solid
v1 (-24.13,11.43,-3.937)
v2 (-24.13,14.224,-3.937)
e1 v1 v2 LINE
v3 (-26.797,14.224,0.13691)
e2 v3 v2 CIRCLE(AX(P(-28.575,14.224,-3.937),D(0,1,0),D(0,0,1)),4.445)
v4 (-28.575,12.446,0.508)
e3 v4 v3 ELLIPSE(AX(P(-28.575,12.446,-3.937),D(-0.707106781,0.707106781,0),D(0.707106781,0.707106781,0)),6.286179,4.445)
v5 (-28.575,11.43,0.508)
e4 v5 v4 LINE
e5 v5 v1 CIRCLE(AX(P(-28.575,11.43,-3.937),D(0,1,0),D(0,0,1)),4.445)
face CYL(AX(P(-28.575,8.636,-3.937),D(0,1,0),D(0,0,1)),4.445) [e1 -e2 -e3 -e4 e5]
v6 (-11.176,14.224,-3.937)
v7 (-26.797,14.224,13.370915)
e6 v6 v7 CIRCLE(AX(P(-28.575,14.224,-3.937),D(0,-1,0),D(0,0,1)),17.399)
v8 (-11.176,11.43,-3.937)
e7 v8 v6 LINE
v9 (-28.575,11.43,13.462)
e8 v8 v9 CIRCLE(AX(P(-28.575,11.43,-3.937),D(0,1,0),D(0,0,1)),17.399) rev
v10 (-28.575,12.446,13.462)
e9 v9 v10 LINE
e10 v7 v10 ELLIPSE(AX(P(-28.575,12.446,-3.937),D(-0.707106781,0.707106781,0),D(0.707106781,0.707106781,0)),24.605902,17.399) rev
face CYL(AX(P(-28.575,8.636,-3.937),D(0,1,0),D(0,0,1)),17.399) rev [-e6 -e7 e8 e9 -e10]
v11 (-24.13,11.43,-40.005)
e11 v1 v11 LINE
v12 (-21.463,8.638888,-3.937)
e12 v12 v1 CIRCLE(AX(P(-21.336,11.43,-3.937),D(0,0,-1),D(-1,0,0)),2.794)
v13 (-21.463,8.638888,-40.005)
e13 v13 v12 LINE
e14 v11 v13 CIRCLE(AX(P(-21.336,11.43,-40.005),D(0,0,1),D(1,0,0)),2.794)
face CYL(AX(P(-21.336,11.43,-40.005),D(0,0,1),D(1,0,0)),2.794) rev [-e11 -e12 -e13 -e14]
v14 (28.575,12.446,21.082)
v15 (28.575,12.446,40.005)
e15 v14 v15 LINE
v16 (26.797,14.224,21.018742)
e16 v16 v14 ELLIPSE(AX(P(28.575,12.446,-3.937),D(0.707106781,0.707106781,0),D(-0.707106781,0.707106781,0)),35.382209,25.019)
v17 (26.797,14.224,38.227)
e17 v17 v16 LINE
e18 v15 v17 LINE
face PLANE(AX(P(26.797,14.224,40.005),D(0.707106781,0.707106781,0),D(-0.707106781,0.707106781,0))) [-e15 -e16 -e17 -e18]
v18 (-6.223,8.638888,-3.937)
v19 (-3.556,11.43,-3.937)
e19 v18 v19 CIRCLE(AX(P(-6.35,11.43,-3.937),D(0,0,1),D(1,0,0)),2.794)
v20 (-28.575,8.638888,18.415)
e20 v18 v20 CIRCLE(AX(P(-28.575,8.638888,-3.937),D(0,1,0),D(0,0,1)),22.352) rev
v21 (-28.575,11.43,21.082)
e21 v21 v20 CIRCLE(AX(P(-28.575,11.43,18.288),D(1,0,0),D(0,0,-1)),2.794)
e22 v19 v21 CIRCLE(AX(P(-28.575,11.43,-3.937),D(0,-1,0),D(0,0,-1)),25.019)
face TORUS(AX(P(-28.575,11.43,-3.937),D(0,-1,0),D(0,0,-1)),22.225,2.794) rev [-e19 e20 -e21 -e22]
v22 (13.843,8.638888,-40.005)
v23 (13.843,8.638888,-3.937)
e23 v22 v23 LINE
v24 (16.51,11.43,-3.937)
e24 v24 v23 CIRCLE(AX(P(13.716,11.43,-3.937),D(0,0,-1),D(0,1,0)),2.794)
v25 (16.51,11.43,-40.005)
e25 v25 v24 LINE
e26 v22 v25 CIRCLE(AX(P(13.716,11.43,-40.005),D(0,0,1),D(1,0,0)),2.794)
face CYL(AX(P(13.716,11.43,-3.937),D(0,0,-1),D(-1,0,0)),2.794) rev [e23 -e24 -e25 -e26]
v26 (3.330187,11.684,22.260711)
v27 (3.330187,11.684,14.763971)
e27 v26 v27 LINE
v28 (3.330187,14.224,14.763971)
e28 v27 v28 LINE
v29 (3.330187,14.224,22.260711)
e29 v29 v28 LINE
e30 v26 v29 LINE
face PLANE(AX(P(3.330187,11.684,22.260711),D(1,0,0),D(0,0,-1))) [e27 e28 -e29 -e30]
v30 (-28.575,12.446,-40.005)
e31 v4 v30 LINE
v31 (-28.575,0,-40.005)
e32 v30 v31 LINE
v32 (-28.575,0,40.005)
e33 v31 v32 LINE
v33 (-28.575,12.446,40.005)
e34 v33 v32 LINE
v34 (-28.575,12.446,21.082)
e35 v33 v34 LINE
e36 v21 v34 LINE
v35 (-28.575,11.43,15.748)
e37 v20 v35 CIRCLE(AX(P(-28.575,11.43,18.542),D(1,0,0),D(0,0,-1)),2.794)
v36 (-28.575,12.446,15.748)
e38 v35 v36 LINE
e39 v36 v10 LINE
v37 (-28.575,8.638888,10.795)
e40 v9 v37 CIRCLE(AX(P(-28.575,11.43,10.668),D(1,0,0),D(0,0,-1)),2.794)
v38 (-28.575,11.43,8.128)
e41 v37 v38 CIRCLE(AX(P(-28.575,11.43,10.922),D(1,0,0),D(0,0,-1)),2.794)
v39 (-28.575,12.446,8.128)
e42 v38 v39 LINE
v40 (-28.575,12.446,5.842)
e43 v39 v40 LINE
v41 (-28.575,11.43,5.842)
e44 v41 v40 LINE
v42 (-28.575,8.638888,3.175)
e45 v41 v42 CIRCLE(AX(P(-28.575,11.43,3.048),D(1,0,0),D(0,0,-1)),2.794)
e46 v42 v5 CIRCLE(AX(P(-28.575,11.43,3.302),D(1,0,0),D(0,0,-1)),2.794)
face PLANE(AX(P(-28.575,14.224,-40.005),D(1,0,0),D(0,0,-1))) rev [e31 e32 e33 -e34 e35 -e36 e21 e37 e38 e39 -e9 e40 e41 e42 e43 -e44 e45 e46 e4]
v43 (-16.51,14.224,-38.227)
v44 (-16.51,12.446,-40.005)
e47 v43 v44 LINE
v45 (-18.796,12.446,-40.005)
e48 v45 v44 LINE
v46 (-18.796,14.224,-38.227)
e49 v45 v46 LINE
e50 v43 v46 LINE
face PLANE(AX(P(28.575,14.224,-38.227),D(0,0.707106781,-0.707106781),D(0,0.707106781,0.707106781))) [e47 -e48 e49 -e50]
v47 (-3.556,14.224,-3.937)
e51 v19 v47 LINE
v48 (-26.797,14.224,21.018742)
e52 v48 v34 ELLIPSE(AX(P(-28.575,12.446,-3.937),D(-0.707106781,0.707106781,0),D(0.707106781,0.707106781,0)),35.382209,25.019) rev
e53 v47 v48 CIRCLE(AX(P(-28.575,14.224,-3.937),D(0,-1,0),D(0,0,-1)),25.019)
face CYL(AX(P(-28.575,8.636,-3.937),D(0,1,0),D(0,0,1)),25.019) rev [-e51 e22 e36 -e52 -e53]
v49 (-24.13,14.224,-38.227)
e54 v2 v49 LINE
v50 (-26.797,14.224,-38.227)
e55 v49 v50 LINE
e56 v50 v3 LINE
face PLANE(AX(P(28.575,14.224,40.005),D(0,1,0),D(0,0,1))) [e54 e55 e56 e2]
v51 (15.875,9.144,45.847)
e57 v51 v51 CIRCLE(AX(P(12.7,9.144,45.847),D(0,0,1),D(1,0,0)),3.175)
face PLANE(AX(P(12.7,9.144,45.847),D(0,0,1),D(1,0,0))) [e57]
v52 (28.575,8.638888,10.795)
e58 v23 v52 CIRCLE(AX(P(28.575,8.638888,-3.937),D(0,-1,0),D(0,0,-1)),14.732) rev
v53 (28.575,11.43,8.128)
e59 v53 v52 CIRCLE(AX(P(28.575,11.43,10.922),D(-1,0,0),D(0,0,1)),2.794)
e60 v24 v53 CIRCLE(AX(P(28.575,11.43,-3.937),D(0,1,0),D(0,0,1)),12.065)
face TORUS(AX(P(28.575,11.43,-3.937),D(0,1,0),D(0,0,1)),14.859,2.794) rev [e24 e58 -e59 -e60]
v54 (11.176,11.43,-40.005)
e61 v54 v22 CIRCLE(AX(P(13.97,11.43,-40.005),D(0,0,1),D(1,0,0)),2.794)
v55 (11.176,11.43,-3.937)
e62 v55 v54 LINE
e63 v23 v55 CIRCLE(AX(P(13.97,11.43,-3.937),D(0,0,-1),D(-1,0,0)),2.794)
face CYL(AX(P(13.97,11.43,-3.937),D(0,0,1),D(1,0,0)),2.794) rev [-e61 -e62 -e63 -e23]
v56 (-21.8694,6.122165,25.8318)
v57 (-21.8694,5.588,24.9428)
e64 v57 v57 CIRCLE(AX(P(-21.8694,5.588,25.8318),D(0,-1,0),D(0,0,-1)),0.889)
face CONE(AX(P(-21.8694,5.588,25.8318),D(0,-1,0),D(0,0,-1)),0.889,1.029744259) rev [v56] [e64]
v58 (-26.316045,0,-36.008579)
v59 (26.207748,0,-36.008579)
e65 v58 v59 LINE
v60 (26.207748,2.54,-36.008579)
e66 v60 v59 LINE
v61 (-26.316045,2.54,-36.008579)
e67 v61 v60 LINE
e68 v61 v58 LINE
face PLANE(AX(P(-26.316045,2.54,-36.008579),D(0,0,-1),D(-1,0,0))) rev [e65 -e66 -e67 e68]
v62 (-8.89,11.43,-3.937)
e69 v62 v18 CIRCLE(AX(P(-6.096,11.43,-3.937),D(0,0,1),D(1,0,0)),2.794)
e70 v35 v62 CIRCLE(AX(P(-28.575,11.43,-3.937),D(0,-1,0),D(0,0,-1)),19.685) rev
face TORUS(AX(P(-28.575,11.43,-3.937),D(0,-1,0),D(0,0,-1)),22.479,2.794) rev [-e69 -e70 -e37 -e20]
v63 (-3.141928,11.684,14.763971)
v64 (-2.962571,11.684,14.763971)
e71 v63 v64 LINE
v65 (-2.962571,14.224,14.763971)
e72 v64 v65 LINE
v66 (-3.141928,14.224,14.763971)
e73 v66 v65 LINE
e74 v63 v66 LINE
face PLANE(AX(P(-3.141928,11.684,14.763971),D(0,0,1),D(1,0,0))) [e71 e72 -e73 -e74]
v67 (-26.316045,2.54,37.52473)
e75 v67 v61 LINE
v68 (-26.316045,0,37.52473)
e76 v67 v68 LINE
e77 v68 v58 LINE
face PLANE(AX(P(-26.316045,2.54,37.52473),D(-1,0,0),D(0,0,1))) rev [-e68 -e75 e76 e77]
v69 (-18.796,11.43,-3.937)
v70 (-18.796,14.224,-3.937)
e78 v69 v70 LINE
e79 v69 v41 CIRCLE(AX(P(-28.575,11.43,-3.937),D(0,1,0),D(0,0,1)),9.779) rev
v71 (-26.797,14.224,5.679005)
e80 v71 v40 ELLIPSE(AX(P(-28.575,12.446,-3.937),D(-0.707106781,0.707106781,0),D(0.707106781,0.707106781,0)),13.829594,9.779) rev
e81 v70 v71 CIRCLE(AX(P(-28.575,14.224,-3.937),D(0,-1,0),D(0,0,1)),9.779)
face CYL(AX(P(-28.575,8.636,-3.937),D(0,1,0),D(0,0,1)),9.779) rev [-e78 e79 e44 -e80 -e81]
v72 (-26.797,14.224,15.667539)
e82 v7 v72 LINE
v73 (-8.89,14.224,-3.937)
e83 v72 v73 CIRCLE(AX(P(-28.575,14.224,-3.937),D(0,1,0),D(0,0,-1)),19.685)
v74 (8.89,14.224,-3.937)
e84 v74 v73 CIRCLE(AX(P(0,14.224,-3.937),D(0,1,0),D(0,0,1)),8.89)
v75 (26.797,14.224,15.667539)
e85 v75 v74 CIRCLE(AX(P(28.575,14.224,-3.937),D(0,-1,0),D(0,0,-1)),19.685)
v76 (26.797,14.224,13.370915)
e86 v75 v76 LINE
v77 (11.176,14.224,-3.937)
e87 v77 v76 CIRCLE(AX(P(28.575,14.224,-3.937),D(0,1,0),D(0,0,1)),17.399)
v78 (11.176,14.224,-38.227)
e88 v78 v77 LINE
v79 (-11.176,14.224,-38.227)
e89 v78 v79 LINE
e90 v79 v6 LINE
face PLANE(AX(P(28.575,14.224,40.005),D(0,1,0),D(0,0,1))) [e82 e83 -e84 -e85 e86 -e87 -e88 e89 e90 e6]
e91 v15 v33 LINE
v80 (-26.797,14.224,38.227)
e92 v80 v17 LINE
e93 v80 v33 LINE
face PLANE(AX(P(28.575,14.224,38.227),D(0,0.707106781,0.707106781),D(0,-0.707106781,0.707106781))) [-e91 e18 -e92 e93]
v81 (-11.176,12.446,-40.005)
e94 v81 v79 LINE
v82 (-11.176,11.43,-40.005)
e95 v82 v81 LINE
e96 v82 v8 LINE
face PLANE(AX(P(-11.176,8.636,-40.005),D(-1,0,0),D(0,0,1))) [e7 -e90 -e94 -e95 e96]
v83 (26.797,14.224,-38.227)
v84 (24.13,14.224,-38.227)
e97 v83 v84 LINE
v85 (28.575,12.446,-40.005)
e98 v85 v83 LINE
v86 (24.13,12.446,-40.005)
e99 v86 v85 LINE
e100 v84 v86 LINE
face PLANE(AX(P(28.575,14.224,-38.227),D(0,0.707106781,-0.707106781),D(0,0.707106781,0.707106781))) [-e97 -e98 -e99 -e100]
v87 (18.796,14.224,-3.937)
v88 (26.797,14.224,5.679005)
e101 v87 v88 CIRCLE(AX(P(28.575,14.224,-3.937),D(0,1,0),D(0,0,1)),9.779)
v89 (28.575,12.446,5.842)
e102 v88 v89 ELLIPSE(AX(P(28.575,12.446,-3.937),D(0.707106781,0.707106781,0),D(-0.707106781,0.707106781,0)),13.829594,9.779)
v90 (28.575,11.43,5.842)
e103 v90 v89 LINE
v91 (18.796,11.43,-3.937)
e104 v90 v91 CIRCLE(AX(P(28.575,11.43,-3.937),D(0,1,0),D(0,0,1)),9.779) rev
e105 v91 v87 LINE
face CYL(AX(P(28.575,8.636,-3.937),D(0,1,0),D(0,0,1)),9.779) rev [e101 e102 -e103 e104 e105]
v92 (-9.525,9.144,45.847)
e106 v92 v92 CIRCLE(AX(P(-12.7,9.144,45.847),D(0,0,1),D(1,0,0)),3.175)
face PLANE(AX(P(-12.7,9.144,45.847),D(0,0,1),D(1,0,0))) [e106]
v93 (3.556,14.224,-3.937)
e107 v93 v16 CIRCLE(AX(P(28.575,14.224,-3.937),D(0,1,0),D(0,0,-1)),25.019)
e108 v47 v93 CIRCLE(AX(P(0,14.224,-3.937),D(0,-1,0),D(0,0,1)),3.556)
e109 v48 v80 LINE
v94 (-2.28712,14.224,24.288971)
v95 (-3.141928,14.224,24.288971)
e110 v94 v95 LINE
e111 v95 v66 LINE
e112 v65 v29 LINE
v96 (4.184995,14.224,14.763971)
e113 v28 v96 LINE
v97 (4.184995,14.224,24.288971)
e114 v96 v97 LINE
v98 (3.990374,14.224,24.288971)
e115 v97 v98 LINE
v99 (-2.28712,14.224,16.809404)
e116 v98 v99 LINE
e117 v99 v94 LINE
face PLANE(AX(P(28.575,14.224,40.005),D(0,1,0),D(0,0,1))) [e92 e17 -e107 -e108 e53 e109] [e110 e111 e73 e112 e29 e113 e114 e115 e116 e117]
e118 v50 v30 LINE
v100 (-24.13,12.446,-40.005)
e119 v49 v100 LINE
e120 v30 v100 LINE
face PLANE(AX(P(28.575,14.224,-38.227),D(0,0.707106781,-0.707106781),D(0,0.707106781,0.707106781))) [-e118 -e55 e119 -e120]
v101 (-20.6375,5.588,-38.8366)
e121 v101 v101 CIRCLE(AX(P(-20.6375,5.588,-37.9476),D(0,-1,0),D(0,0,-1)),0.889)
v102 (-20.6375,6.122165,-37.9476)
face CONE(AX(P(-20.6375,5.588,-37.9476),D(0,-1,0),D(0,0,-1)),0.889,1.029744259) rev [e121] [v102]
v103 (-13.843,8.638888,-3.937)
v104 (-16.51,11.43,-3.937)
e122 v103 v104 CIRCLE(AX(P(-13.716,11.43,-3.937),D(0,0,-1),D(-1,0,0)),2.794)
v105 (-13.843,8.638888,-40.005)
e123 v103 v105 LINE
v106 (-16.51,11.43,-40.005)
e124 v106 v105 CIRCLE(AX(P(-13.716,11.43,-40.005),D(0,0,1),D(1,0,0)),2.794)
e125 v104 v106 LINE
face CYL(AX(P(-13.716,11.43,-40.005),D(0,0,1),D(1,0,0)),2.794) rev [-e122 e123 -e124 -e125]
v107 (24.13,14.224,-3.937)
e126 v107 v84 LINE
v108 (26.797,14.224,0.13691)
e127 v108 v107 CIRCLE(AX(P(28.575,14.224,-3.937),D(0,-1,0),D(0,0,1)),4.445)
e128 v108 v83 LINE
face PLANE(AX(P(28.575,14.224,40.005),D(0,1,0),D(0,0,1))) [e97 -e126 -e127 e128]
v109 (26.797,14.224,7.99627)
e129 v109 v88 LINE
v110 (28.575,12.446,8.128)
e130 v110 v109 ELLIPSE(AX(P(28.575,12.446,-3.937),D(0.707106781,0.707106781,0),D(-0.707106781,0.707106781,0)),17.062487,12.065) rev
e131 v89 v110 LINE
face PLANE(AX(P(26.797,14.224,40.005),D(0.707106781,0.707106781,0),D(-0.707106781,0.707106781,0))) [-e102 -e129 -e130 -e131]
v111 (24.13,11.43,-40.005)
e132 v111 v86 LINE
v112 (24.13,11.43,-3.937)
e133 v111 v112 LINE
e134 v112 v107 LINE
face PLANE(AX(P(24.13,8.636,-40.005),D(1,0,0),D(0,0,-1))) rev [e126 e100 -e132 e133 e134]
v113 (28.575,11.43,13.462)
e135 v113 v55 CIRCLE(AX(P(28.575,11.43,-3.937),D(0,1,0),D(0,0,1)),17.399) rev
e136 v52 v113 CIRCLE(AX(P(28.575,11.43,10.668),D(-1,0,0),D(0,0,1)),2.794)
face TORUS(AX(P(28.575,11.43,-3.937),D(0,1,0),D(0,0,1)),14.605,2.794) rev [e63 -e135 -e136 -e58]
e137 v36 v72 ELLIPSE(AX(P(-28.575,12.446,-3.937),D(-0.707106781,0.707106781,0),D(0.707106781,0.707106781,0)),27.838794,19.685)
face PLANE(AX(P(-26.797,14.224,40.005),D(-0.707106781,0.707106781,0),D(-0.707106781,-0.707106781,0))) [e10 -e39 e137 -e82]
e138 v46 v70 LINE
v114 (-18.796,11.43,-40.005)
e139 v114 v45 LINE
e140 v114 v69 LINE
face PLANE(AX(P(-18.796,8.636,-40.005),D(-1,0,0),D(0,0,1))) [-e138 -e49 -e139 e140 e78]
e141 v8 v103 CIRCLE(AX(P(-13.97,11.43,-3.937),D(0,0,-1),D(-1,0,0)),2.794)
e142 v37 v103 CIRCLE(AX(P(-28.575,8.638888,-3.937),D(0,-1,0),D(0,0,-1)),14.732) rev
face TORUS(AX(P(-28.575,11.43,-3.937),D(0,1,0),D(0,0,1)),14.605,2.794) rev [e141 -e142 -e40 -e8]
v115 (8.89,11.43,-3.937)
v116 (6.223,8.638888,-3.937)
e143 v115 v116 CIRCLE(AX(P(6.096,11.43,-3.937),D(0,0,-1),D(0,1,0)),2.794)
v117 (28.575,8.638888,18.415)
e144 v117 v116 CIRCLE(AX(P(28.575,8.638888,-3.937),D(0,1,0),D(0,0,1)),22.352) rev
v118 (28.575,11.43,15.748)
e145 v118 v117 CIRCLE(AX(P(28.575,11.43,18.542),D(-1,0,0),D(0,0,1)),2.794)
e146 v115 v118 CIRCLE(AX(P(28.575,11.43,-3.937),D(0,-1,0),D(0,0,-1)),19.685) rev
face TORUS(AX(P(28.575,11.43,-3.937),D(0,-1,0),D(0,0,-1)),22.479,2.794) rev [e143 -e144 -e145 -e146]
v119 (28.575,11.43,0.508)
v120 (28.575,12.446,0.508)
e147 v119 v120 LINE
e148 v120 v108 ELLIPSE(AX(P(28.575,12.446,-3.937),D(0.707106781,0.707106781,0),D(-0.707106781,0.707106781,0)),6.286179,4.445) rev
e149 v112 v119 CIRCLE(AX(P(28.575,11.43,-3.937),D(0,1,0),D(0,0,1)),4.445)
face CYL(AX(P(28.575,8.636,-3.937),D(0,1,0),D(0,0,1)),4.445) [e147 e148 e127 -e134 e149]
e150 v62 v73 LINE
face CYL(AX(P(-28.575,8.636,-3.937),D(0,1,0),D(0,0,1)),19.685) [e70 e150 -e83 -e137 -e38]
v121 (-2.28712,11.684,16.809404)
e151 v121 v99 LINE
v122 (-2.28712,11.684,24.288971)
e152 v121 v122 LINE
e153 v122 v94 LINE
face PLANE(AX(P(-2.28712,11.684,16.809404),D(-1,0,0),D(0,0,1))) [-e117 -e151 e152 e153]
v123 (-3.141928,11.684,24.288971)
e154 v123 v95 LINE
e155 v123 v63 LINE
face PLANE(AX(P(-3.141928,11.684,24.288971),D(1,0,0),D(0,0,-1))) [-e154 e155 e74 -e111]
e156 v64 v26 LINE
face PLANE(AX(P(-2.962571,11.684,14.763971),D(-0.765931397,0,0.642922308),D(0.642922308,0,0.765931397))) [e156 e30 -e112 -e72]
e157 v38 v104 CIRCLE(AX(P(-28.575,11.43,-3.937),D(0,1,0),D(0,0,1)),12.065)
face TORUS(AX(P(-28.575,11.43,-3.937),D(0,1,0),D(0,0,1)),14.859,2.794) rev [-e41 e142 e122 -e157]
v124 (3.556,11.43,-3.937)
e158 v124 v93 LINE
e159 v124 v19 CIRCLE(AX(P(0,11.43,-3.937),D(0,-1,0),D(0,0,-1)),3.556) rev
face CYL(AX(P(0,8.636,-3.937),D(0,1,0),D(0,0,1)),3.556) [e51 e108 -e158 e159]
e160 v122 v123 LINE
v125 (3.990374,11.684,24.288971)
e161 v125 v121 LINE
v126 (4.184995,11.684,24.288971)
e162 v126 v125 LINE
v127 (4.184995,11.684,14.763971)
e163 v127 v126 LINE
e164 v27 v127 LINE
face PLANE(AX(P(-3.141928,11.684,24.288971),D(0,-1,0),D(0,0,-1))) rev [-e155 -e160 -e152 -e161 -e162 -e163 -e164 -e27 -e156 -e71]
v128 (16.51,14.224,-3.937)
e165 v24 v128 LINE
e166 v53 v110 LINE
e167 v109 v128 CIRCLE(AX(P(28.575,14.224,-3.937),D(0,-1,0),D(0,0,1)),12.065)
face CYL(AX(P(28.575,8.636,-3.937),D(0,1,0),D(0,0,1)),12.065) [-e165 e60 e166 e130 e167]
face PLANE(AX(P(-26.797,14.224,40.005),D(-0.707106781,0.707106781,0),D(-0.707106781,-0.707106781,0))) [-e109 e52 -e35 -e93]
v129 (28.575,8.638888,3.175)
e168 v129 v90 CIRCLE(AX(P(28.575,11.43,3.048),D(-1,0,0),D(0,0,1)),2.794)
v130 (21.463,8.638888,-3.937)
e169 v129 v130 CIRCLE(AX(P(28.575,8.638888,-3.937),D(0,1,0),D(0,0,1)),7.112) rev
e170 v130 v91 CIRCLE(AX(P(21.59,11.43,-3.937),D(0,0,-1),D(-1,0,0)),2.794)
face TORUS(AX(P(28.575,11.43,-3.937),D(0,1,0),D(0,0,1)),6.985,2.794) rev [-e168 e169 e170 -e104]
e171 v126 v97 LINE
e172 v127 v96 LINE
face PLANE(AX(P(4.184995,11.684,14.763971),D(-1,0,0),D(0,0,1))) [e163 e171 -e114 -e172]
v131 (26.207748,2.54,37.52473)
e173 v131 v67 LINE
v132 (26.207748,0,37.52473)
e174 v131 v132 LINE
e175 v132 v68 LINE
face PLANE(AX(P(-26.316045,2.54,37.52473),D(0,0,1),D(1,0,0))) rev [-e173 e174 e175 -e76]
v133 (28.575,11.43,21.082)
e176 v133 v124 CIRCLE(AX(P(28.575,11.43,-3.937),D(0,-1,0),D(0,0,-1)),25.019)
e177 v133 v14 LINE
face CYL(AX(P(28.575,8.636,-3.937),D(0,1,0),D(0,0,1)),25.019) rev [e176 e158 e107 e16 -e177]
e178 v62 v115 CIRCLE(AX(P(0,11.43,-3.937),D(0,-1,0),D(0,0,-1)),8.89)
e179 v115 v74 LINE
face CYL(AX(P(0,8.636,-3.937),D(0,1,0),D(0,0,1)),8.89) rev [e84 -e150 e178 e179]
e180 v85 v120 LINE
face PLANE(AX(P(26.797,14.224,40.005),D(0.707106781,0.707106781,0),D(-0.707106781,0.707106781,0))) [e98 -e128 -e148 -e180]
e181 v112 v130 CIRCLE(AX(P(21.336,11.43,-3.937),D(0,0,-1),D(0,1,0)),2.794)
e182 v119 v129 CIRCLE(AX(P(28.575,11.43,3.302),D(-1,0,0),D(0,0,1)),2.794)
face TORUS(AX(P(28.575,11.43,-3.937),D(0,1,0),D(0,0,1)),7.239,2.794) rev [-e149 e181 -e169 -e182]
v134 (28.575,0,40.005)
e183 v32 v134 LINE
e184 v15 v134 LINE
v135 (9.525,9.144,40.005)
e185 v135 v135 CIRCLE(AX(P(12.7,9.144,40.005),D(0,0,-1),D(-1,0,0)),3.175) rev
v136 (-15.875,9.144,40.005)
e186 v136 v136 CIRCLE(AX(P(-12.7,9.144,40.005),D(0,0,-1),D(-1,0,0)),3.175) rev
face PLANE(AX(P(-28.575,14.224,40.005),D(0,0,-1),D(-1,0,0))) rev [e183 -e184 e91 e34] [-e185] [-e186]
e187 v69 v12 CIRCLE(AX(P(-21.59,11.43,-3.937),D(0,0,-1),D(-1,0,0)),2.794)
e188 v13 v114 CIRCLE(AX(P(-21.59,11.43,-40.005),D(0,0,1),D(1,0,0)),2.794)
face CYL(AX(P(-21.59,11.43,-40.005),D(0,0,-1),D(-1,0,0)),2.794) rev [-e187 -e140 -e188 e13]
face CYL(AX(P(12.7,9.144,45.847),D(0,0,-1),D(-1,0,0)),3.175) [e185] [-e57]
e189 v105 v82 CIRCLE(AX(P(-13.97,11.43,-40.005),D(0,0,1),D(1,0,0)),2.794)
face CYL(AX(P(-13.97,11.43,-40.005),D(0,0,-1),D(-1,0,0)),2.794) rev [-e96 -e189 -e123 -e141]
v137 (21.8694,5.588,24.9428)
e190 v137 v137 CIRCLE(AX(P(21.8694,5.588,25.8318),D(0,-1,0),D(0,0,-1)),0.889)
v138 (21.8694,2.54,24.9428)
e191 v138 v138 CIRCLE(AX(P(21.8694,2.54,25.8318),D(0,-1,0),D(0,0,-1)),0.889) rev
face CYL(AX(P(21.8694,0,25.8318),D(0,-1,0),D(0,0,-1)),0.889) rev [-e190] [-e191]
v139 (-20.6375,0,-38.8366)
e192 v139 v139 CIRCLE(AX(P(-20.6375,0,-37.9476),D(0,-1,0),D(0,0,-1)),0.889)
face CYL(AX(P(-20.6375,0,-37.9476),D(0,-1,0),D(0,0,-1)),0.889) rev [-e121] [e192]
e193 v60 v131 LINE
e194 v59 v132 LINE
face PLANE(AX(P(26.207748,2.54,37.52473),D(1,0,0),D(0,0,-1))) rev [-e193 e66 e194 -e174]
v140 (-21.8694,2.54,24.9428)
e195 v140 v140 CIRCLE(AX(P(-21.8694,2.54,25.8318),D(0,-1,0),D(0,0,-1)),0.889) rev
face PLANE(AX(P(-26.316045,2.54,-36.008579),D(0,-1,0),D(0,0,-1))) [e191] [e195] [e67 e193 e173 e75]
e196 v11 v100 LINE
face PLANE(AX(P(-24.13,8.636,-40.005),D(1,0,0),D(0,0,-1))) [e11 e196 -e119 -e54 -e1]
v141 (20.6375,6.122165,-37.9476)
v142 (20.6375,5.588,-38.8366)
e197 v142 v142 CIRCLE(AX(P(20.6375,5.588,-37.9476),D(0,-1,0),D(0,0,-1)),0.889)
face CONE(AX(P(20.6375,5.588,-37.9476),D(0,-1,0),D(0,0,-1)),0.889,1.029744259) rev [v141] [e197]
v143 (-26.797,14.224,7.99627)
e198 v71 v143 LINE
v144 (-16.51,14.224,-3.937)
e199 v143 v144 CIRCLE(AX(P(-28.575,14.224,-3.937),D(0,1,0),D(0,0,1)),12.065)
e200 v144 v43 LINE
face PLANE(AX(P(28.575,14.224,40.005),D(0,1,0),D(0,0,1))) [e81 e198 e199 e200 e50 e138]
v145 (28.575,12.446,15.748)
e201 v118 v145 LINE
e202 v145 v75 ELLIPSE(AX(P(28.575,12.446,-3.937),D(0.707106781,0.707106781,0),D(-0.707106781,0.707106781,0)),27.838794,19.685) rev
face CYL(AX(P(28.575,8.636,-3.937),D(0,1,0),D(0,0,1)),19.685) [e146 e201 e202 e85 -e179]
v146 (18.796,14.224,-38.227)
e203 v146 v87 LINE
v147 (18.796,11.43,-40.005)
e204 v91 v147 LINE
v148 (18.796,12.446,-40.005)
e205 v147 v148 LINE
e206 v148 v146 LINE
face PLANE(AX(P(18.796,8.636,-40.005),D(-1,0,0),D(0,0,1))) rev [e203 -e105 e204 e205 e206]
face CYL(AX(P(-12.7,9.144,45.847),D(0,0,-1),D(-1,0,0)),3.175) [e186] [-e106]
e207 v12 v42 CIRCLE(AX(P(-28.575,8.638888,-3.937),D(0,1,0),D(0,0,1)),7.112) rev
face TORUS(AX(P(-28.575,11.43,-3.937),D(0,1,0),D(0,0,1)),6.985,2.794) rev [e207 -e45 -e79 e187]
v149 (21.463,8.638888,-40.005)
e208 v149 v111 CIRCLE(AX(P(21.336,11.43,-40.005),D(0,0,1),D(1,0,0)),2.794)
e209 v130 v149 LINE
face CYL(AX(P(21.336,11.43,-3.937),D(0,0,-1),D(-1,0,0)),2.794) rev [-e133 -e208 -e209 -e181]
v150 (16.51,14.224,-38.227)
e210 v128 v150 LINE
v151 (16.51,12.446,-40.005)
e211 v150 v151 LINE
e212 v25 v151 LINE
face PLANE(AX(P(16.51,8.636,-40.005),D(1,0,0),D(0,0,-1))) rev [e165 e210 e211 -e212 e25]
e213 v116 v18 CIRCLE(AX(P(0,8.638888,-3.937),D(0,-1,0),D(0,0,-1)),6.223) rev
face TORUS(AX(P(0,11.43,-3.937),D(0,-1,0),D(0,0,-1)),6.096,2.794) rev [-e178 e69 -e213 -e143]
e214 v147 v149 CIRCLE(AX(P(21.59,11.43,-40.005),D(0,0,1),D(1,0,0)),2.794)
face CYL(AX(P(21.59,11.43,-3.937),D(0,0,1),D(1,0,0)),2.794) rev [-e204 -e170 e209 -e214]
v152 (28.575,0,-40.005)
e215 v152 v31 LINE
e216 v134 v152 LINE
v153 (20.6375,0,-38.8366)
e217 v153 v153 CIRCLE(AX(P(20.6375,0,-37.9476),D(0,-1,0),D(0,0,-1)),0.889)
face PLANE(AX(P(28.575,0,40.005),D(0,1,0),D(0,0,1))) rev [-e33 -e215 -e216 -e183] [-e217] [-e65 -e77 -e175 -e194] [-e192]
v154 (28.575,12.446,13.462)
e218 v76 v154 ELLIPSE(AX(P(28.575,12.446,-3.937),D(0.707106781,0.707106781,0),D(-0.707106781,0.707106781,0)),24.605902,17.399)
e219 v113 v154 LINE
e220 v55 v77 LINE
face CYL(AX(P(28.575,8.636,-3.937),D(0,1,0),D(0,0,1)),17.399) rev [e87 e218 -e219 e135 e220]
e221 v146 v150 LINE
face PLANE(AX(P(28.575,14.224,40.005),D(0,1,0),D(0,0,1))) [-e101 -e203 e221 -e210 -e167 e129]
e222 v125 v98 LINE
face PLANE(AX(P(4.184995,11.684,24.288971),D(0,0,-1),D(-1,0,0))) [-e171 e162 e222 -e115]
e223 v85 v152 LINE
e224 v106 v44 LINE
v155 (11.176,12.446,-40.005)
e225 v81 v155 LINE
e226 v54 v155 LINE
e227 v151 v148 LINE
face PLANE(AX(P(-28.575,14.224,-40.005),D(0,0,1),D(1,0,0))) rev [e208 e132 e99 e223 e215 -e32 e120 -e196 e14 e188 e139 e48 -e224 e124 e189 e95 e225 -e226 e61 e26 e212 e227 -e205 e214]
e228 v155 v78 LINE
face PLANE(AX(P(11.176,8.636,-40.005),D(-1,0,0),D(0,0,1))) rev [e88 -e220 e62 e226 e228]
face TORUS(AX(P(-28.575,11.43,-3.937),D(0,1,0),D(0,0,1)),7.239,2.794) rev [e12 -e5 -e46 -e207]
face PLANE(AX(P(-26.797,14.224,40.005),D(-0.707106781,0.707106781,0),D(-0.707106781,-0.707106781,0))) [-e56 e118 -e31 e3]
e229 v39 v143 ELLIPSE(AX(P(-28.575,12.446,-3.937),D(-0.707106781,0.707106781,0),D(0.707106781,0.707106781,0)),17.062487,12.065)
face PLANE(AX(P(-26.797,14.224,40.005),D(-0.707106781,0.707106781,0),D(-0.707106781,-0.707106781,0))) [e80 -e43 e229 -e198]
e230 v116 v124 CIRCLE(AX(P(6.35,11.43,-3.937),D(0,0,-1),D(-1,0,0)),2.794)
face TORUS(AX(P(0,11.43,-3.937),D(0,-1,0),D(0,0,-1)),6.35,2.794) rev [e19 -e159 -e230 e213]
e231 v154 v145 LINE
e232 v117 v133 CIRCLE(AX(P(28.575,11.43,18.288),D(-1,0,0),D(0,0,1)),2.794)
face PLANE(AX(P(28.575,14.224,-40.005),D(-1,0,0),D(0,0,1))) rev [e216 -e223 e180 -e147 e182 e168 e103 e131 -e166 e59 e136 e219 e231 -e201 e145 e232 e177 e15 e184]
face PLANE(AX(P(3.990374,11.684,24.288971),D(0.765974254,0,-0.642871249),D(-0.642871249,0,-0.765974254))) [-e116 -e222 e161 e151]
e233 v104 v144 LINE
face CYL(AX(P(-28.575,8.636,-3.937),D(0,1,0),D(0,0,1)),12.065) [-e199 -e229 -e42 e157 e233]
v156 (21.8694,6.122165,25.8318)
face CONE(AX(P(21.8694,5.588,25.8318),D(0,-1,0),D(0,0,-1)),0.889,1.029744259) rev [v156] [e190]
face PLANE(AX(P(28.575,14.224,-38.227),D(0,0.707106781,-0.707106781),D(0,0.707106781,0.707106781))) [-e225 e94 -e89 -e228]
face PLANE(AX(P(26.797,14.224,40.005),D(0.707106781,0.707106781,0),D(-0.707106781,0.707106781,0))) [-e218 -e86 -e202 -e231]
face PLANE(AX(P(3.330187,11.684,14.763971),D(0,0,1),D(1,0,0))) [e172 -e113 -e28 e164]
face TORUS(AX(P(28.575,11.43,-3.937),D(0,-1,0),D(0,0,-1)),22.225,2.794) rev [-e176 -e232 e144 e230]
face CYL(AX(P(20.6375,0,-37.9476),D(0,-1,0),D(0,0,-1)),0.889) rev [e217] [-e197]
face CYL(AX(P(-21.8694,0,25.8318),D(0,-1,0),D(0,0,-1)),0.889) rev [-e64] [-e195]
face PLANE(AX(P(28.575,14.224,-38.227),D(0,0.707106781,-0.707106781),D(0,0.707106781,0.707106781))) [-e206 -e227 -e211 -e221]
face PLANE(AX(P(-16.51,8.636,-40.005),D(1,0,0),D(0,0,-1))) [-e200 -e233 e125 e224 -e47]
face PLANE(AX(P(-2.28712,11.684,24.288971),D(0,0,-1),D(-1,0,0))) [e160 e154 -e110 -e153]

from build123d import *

# Parameters (mm, degrees)
SKETCH1_W                 = 57.15
SKETCH1_H                 = 80.01
BOSS_EXTRUDE1_DEPTH       = 14.224
F_2_56_TAPPED_HOLE1_D     = 1.778
F_2_56_TAPPED_HOLE1_DEPTH = 5.588
F_2_56_TAPPED_HOLE1_TIP   = 0.53416509
CHAMFER1_SIZE             = 1.778
SKETCH4_W                 = 52.523792639
SKETCH4_H                 = 73.533309695
CUT_EXTRUDE1_DEPTH        = 2.54
SKETCH5_R                 = 3.175
BOSS_EXTRUDE2_DEPTH       = 5.842
CUT_EXTRUDE2_DEPTH        = 5.588
FILLET1_R                 = 2.794
CUT_EXTRUDE3_DEPTH        = 2.54


with BuildPart() as part:
    # Sketch1 → Boss-Extrude1 (new body)
    with BuildSketch(Plane(origin=(0, 0, 0), x_dir=(1, 0, 0), z_dir=(0, 1, 0))):
        Rectangle(SKETCH1_W, SKETCH1_H)
    extrude(amount=BOSS_EXTRUDE1_DEPTH)

    # #2-56 Tapped Hole1
    with Locations(Plane.XZ):
        with Locations((-20.6375, -37.9476), (-21.8694, 25.8318), (21.8694, 25.8318), (20.6375, -37.9476)):
            Hole(F_2_56_TAPPED_HOLE1_D / 2, depth=F_2_56_TAPPED_HOLE1_DEPTH)
            with Locations((0, 0, -(F_2_56_TAPPED_HOLE1_DEPTH + F_2_56_TAPPED_HOLE1_TIP / 2))):  # 118° drill point
                Cone(0, F_2_56_TAPPED_HOLE1_D / 2, F_2_56_TAPPED_HOLE1_TIP, mode=Mode.SUBTRACT)

    # Chamfer1
    chamfer1_edges = [part.edges().sort_by_distance(p)[0] for p in [
        (-28.575, 14.224, 0),
        (0, 14.224, 40.005),
        (28.575, 14.224, 0),
        (0, 14.224, -40.005),
    ]]
    chamfer(chamfer1_edges, length=CHAMFER1_SIZE)

    # Sketch4 → Cut-Extrude1 (cut)
    with BuildSketch(Plane.XZ):
        with Locations((-0.054148239, 0.758075358)):
            Rectangle(SKETCH4_W, SKETCH4_H)
    extrude(amount=-CUT_EXTRUDE1_DEPTH, mode=Mode.SUBTRACT)

    # Sketch5 → Boss-Extrude2 (add)
    with BuildSketch(Plane.XY.offset(40.005)):
        with Locations(Location((-12.7, 9.144, 0), (0, 0, 180))):
            Circle(SKETCH5_R)
        with Locations(Location((12.7, 9.144, 0), (0, 0, 180))):
            Circle(SKETCH5_R)
    extrude(amount=BOSS_EXTRUDE2_DEPTH)

    # Sketch6 → Cut-Extrude2 (cut)
    with BuildSketch(Plane(origin=(0, 14.224, 0), x_dir=(1, 0, 0), z_dir=(0, 1, 0))):
        with BuildLine():
            Line((18.796, 40.005), (18.796, 3.937))
            ThreePointArc((18.796, 3.937), (21.660202787, -2.977797213), (28.575, -5.842))
            Line((28.575, -5.842), (28.575, -0.508))
            ThreePointArc((28.575, -0.508), (25.431910358, 0.793910358), (24.13, 3.937))
            Line((24.13, 3.937), (24.13, 40.005))
            Line((24.13, 40.005), (18.796, 40.005))
        make_face()
        with BuildLine():
            Line((11.176, 40.005), (11.176, 3.937))
            ThreePointArc((11.176, 3.937), (16.272049114, -8.365950886), (28.575, -13.462))
            Line((28.575, -13.462), (28.575, -8.128))
            ThreePointArc((28.575, -8.128), (20.043756685, -4.594243315), (16.51, 3.937))
            Line((16.51, 3.937), (16.51, 40.005))
            Line((16.51, 40.005), (11.176, 40.005))
        make_face()
        with BuildLine():
            Line((28.575, -15.748), (28.575, -21.082))
            ThreePointArc((28.575, -21.082), (10.883895441, -13.754104559), (3.556, 3.937))
            ThreePointArc((3.556, 3.937), (2.514471714, 6.451471714), (0, 7.493))
            Line((0, 7.493), (0, 12.827))
            ThreePointArc((0, 12.827), (6.286179285, 10.223179285), (8.89, 3.937))
            ThreePointArc((8.89, 3.937), (14.655603012, -9.982396988), (28.575, -15.748))
        make_face()
    cut_extrude2 = extrude(amount=-CUT_EXTRUDE2_DEPTH, mode=Mode.SUBTRACT)

    # Mirror1: Cut-Extrude2 across plane
    add(cut_extrude2.mirror(Plane(origin=(0, 0, 0), x_dir=(0, 0, 1), z_dir=(1, 0, 0))), mode=Mode.SUBTRACT)

    # Fillet1
    # the kernel refuses this fillet: 2.794 mm, written as the material it adds along each edge
    with BuildSketch(Plane(origin=(-28.575, 8.636, -3.937), x_dir=(1, 0, 0), z_dir=(0, 0, -1))) as fillet1_piece_1:
        with BuildLine():
            CenterArc((9.779 - FILLET1_R, -FILLET1_R), FILLET1_R, 0, 90)
            Line((9.779, -FILLET1_R), (9.779, 0))
            Line((9.779, 0), (9.779 - FILLET1_R, 0))
        make_face()
    revolve(axis=Axis((-28.575, 8.636, -3.937), (0, -1, 0)), revolution_arc=90)
    with BuildSketch(Plane(origin=(-28.575, 8.636, -3.937), x_dir=(0, 0, 1), z_dir=(-1, 0, 0))) as fillet1_piece_2:
        with BuildLine():
            CenterArc((4.445 + FILLET1_R, FILLET1_R), FILLET1_R, 180, 90)
            Line((4.445 + FILLET1_R, 0), (4.445, 0))
            Line((4.445, 0), (4.445, FILLET1_R))
        make_face()
    revolve(axis=Axis((-28.575, 8.636, -3.937), (0, 1, 0)), revolution_arc=90)
    with BuildSketch(Plane(origin=(-28.575, 8.636, -3.937), x_dir=(0, 0, 1), z_dir=(-1, 0, 0))) as fillet1_piece_3:
        with BuildLine():
            CenterArc((12.065 + FILLET1_R, FILLET1_R), FILLET1_R, 180, 90)
            Line((12.065 + FILLET1_R, 0), (12.065, 0))
            Line((12.065, 0), (12.065, FILLET1_R))
        make_face()
    revolve(axis=Axis((-28.575, 8.636, -3.937), (0, 1, 0)), revolution_arc=90)
    with BuildSketch(Plane(origin=(-28.575, 8.636, -3.937), x_dir=(1, 0, 0), z_dir=(0, 0, -1))) as fillet1_piece_4:
        with BuildLine():
            CenterArc((17.399 - FILLET1_R, -FILLET1_R), FILLET1_R, 0, 90)
            Line((17.399, -FILLET1_R), (17.399, 0))
            Line((17.399, 0), (17.399 - FILLET1_R, 0))
        make_face()
    revolve(axis=Axis((-28.575, 8.636, -3.937), (0, -1, 0)), revolution_arc=90)
    with BuildSketch(Plane(origin=(28.575, 8.636, -3.937), x_dir=(0, 0, 1), z_dir=(1, 0, 0))) as fillet1_piece_5:
        with BuildLine():
            CenterArc((25.019 - FILLET1_R, -FILLET1_R), FILLET1_R, 0, 90)
            Line((25.019, -FILLET1_R), (25.019, 0))
            Line((25.019, 0), (25.019 - FILLET1_R, 0))
        make_face()
    revolve(axis=Axis((28.575, 8.636, -3.937), (0, -1, 0)), revolution_arc=90)
    with BuildSketch(Plane(origin=(0, 8.636, -3.937), x_dir=(-1, 0, 0), z_dir=(0, 0, 1))) as fillet1_piece_6:
        with BuildLine():
            CenterArc((3.556 + FILLET1_R, -FILLET1_R), FILLET1_R, 90, 90)
            Line((3.556, -FILLET1_R), (3.556, 0))
            Line((3.556, 0), (3.556 + FILLET1_R, 0))
        make_face()
    revolve(axis=Axis((0, 8.636, -3.937), (0, -1, 0)), revolution_arc=180)
    with BuildSketch(Plane(origin=(28.575, 8.636, -3.937), x_dir=(-1, 0, 0), z_dir=(0, 0, -1))) as fillet1_piece_7:
        with BuildLine():
            CenterArc((19.685 + FILLET1_R, FILLET1_R), FILLET1_R, 180, 90)
            Line((19.685 + FILLET1_R, 0), (19.685, 0))
            Line((19.685, 0), (19.685, FILLET1_R))
        make_face()
    revolve(axis=Axis((28.575, 8.636, -3.937), (0, 1, 0)), revolution_arc=90)
    with BuildSketch(Plane(origin=(-28.575, 8.636, -3.937), x_dir=(1, 0, 0), z_dir=(0, 0, -1))) as fillet1_piece_8:
        with BuildLine():
            CenterArc((19.685 + FILLET1_R, -FILLET1_R), FILLET1_R, 90, 90)
            Line((19.685 + FILLET1_R, 0), (19.685, 0))
            Line((19.685, 0), (19.685, -FILLET1_R))
        make_face()
    revolve(axis=Axis((-28.575, 8.636, -3.937), (0, -1, 0)), revolution_arc=90)
    with BuildSketch(Plane(origin=(28.575, 8.636, -3.937), x_dir=(0, 0, 1), z_dir=(1, 0, 0))) as fillet1_piece_9:
        with BuildLine():
            CenterArc((12.065 + FILLET1_R, -FILLET1_R), FILLET1_R, 90, 90)
            Line((12.065, -FILLET1_R), (12.065, 0))
            Line((12.065, 0), (12.065 + FILLET1_R, 0))
        make_face()
    revolve(axis=Axis((28.575, 8.636, -3.937), (0, -1, 0)), revolution_arc=90)
    with BuildSketch(Plane(origin=(28.575, 8.636, -3.937), x_dir=(-1, 0, 0), z_dir=(0, 0, -1))) as fillet1_piece_10:
        with BuildLine():
            CenterArc((17.399 - FILLET1_R, FILLET1_R), FILLET1_R, 270, 90)
            Line((17.399 - FILLET1_R, 0), (17.399, 0))
            Line((17.399, 0), (17.399, FILLET1_R))
        make_face()
    revolve(axis=Axis((28.575, 8.636, -3.937), (0, 1, 0)), revolution_arc=90)
    with BuildSketch(Plane(origin=(28.575, 8.636, -3.937), x_dir=(-1, 0, 0), z_dir=(0, 0, -1))) as fillet1_piece_11:
        with BuildLine():
            CenterArc((9.779 - FILLET1_R, FILLET1_R), FILLET1_R, 270, 90)
            Line((9.779 - FILLET1_R, 0), (9.779, 0))
            Line((9.779, 0), (9.779, FILLET1_R))
        make_face()
    revolve(axis=Axis((28.575, 8.636, -3.937), (0, 1, 0)), revolution_arc=90)
    with BuildSketch(Plane(origin=(28.575, 8.636, -3.937), x_dir=(0, 0, 1), z_dir=(1, 0, 0))) as fillet1_piece_12:
        with BuildLine():
            CenterArc((4.445 + FILLET1_R, -FILLET1_R), FILLET1_R, 90, 90)
            Line((4.445, -FILLET1_R), (4.445, 0))
            Line((4.445, 0), (4.445 + FILLET1_R, 0))
        make_face()
    revolve(axis=Axis((28.575, 8.636, -3.937), (0, -1, 0)), revolution_arc=90)
    with BuildSketch(Plane(origin=(-18.796, 8.636, -40.005), x_dir=(-1, 0, 0), z_dir=(0, 0, 1)), Plane(origin=(-11.176, 8.636, -40.005), x_dir=(-1, 0, 0), z_dir=(0, 0, 1)), Plane(origin=(11.176, 8.636, -40.005), x_dir=(0, 1, 0), z_dir=(0, 0, 1)), Plane(origin=(18.796, 8.636, -40.005), x_dir=(0, 1, 0), z_dir=(0, 0, 1))) as fillet1_piece_13:
        with BuildLine():
            CenterArc((FILLET1_R, -FILLET1_R), FILLET1_R, 90, 90)
            Line((0, -FILLET1_R), (0, 0))
            Line((0, 0), (FILLET1_R, 0))
        make_face()
    extrude(amount=36.068)
    with BuildSketch(Plane(origin=(-24.13, 8.636, -3.937), x_dir=(0, 1, 0), z_dir=(0, 0, -1)), Plane(origin=(-16.51, 8.636, -3.937), x_dir=(0, 1, 0), z_dir=(0, 0, -1)), Plane(origin=(16.51, 8.636, -3.937), x_dir=(-1, 0, 0), z_dir=(0, 0, -1)), Plane(origin=(24.13, 8.636, -3.937), x_dir=(-1, 0, 0), z_dir=(0, 0, -1))) as fillet1_piece_14:
        with BuildLine():
            CenterArc((FILLET1_R, FILLET1_R), FILLET1_R, 180, 90)
            Line((0, FILLET1_R), (0, 0))
            Line((0, 0), (FILLET1_R, 0))
        make_face()
    extrude(amount=36.068)
    with BuildSketch(Plane(origin=(-28.575, 8.636, -3.937), x_dir=(0, 0, 1), z_dir=(-1, 0, 0))) as fillet1_piece_15:
        with BuildLine():
            CenterArc((25.019 - FILLET1_R, FILLET1_R), FILLET1_R, 270, 90)
            Line((25.019, FILLET1_R), (25.019, 0))
            Line((25.019, 0), (25.019 - FILLET1_R, 0))
        make_face()
    revolve(axis=Axis((-28.575, 8.636, -3.937), (0, 1, 0)), revolution_arc=90)
    with BuildSketch(Plane(origin=(0, 8.636, -3.937), x_dir=(1, 0, 0), z_dir=(0, 0, 1))) as fillet1_piece_16:
        with BuildLine():
            CenterArc((8.89 - FILLET1_R, FILLET1_R), FILLET1_R, 270, 90)
            Line((8.89 - FILLET1_R, 0), (8.89, 0))
            Line((8.89, 0), (8.89, FILLET1_R))
        make_face()
    revolve(axis=Axis((0, 8.636, -3.937), (0, 1, 0)), revolution_arc=180)

    # Sketch7 → Cut-Extrude3 (cut)
    with BuildSketch(Plane(origin=(0, 14.224, 0), x_dir=(1, 0, 0), z_dir=(0, 1, 0))):
        Polygon((-3.141927936, -24.288971493), (-3.141927936, -14.763971493), (-2.962570965, -14.763971493), (3.330187448, -22.260711276), (3.330187448, -14.763971493), (4.18499514, -14.763971493), (4.18499514, -24.288971493), (3.990373746, -24.288971493), (-2.287120244, -16.809404185), (-2.287120244, -24.288971493), align=None)
    extrude(amount=-CUT_EXTRUDE3_DEPTH, mode=Mode.SUBTRACT)


solid = part.part
